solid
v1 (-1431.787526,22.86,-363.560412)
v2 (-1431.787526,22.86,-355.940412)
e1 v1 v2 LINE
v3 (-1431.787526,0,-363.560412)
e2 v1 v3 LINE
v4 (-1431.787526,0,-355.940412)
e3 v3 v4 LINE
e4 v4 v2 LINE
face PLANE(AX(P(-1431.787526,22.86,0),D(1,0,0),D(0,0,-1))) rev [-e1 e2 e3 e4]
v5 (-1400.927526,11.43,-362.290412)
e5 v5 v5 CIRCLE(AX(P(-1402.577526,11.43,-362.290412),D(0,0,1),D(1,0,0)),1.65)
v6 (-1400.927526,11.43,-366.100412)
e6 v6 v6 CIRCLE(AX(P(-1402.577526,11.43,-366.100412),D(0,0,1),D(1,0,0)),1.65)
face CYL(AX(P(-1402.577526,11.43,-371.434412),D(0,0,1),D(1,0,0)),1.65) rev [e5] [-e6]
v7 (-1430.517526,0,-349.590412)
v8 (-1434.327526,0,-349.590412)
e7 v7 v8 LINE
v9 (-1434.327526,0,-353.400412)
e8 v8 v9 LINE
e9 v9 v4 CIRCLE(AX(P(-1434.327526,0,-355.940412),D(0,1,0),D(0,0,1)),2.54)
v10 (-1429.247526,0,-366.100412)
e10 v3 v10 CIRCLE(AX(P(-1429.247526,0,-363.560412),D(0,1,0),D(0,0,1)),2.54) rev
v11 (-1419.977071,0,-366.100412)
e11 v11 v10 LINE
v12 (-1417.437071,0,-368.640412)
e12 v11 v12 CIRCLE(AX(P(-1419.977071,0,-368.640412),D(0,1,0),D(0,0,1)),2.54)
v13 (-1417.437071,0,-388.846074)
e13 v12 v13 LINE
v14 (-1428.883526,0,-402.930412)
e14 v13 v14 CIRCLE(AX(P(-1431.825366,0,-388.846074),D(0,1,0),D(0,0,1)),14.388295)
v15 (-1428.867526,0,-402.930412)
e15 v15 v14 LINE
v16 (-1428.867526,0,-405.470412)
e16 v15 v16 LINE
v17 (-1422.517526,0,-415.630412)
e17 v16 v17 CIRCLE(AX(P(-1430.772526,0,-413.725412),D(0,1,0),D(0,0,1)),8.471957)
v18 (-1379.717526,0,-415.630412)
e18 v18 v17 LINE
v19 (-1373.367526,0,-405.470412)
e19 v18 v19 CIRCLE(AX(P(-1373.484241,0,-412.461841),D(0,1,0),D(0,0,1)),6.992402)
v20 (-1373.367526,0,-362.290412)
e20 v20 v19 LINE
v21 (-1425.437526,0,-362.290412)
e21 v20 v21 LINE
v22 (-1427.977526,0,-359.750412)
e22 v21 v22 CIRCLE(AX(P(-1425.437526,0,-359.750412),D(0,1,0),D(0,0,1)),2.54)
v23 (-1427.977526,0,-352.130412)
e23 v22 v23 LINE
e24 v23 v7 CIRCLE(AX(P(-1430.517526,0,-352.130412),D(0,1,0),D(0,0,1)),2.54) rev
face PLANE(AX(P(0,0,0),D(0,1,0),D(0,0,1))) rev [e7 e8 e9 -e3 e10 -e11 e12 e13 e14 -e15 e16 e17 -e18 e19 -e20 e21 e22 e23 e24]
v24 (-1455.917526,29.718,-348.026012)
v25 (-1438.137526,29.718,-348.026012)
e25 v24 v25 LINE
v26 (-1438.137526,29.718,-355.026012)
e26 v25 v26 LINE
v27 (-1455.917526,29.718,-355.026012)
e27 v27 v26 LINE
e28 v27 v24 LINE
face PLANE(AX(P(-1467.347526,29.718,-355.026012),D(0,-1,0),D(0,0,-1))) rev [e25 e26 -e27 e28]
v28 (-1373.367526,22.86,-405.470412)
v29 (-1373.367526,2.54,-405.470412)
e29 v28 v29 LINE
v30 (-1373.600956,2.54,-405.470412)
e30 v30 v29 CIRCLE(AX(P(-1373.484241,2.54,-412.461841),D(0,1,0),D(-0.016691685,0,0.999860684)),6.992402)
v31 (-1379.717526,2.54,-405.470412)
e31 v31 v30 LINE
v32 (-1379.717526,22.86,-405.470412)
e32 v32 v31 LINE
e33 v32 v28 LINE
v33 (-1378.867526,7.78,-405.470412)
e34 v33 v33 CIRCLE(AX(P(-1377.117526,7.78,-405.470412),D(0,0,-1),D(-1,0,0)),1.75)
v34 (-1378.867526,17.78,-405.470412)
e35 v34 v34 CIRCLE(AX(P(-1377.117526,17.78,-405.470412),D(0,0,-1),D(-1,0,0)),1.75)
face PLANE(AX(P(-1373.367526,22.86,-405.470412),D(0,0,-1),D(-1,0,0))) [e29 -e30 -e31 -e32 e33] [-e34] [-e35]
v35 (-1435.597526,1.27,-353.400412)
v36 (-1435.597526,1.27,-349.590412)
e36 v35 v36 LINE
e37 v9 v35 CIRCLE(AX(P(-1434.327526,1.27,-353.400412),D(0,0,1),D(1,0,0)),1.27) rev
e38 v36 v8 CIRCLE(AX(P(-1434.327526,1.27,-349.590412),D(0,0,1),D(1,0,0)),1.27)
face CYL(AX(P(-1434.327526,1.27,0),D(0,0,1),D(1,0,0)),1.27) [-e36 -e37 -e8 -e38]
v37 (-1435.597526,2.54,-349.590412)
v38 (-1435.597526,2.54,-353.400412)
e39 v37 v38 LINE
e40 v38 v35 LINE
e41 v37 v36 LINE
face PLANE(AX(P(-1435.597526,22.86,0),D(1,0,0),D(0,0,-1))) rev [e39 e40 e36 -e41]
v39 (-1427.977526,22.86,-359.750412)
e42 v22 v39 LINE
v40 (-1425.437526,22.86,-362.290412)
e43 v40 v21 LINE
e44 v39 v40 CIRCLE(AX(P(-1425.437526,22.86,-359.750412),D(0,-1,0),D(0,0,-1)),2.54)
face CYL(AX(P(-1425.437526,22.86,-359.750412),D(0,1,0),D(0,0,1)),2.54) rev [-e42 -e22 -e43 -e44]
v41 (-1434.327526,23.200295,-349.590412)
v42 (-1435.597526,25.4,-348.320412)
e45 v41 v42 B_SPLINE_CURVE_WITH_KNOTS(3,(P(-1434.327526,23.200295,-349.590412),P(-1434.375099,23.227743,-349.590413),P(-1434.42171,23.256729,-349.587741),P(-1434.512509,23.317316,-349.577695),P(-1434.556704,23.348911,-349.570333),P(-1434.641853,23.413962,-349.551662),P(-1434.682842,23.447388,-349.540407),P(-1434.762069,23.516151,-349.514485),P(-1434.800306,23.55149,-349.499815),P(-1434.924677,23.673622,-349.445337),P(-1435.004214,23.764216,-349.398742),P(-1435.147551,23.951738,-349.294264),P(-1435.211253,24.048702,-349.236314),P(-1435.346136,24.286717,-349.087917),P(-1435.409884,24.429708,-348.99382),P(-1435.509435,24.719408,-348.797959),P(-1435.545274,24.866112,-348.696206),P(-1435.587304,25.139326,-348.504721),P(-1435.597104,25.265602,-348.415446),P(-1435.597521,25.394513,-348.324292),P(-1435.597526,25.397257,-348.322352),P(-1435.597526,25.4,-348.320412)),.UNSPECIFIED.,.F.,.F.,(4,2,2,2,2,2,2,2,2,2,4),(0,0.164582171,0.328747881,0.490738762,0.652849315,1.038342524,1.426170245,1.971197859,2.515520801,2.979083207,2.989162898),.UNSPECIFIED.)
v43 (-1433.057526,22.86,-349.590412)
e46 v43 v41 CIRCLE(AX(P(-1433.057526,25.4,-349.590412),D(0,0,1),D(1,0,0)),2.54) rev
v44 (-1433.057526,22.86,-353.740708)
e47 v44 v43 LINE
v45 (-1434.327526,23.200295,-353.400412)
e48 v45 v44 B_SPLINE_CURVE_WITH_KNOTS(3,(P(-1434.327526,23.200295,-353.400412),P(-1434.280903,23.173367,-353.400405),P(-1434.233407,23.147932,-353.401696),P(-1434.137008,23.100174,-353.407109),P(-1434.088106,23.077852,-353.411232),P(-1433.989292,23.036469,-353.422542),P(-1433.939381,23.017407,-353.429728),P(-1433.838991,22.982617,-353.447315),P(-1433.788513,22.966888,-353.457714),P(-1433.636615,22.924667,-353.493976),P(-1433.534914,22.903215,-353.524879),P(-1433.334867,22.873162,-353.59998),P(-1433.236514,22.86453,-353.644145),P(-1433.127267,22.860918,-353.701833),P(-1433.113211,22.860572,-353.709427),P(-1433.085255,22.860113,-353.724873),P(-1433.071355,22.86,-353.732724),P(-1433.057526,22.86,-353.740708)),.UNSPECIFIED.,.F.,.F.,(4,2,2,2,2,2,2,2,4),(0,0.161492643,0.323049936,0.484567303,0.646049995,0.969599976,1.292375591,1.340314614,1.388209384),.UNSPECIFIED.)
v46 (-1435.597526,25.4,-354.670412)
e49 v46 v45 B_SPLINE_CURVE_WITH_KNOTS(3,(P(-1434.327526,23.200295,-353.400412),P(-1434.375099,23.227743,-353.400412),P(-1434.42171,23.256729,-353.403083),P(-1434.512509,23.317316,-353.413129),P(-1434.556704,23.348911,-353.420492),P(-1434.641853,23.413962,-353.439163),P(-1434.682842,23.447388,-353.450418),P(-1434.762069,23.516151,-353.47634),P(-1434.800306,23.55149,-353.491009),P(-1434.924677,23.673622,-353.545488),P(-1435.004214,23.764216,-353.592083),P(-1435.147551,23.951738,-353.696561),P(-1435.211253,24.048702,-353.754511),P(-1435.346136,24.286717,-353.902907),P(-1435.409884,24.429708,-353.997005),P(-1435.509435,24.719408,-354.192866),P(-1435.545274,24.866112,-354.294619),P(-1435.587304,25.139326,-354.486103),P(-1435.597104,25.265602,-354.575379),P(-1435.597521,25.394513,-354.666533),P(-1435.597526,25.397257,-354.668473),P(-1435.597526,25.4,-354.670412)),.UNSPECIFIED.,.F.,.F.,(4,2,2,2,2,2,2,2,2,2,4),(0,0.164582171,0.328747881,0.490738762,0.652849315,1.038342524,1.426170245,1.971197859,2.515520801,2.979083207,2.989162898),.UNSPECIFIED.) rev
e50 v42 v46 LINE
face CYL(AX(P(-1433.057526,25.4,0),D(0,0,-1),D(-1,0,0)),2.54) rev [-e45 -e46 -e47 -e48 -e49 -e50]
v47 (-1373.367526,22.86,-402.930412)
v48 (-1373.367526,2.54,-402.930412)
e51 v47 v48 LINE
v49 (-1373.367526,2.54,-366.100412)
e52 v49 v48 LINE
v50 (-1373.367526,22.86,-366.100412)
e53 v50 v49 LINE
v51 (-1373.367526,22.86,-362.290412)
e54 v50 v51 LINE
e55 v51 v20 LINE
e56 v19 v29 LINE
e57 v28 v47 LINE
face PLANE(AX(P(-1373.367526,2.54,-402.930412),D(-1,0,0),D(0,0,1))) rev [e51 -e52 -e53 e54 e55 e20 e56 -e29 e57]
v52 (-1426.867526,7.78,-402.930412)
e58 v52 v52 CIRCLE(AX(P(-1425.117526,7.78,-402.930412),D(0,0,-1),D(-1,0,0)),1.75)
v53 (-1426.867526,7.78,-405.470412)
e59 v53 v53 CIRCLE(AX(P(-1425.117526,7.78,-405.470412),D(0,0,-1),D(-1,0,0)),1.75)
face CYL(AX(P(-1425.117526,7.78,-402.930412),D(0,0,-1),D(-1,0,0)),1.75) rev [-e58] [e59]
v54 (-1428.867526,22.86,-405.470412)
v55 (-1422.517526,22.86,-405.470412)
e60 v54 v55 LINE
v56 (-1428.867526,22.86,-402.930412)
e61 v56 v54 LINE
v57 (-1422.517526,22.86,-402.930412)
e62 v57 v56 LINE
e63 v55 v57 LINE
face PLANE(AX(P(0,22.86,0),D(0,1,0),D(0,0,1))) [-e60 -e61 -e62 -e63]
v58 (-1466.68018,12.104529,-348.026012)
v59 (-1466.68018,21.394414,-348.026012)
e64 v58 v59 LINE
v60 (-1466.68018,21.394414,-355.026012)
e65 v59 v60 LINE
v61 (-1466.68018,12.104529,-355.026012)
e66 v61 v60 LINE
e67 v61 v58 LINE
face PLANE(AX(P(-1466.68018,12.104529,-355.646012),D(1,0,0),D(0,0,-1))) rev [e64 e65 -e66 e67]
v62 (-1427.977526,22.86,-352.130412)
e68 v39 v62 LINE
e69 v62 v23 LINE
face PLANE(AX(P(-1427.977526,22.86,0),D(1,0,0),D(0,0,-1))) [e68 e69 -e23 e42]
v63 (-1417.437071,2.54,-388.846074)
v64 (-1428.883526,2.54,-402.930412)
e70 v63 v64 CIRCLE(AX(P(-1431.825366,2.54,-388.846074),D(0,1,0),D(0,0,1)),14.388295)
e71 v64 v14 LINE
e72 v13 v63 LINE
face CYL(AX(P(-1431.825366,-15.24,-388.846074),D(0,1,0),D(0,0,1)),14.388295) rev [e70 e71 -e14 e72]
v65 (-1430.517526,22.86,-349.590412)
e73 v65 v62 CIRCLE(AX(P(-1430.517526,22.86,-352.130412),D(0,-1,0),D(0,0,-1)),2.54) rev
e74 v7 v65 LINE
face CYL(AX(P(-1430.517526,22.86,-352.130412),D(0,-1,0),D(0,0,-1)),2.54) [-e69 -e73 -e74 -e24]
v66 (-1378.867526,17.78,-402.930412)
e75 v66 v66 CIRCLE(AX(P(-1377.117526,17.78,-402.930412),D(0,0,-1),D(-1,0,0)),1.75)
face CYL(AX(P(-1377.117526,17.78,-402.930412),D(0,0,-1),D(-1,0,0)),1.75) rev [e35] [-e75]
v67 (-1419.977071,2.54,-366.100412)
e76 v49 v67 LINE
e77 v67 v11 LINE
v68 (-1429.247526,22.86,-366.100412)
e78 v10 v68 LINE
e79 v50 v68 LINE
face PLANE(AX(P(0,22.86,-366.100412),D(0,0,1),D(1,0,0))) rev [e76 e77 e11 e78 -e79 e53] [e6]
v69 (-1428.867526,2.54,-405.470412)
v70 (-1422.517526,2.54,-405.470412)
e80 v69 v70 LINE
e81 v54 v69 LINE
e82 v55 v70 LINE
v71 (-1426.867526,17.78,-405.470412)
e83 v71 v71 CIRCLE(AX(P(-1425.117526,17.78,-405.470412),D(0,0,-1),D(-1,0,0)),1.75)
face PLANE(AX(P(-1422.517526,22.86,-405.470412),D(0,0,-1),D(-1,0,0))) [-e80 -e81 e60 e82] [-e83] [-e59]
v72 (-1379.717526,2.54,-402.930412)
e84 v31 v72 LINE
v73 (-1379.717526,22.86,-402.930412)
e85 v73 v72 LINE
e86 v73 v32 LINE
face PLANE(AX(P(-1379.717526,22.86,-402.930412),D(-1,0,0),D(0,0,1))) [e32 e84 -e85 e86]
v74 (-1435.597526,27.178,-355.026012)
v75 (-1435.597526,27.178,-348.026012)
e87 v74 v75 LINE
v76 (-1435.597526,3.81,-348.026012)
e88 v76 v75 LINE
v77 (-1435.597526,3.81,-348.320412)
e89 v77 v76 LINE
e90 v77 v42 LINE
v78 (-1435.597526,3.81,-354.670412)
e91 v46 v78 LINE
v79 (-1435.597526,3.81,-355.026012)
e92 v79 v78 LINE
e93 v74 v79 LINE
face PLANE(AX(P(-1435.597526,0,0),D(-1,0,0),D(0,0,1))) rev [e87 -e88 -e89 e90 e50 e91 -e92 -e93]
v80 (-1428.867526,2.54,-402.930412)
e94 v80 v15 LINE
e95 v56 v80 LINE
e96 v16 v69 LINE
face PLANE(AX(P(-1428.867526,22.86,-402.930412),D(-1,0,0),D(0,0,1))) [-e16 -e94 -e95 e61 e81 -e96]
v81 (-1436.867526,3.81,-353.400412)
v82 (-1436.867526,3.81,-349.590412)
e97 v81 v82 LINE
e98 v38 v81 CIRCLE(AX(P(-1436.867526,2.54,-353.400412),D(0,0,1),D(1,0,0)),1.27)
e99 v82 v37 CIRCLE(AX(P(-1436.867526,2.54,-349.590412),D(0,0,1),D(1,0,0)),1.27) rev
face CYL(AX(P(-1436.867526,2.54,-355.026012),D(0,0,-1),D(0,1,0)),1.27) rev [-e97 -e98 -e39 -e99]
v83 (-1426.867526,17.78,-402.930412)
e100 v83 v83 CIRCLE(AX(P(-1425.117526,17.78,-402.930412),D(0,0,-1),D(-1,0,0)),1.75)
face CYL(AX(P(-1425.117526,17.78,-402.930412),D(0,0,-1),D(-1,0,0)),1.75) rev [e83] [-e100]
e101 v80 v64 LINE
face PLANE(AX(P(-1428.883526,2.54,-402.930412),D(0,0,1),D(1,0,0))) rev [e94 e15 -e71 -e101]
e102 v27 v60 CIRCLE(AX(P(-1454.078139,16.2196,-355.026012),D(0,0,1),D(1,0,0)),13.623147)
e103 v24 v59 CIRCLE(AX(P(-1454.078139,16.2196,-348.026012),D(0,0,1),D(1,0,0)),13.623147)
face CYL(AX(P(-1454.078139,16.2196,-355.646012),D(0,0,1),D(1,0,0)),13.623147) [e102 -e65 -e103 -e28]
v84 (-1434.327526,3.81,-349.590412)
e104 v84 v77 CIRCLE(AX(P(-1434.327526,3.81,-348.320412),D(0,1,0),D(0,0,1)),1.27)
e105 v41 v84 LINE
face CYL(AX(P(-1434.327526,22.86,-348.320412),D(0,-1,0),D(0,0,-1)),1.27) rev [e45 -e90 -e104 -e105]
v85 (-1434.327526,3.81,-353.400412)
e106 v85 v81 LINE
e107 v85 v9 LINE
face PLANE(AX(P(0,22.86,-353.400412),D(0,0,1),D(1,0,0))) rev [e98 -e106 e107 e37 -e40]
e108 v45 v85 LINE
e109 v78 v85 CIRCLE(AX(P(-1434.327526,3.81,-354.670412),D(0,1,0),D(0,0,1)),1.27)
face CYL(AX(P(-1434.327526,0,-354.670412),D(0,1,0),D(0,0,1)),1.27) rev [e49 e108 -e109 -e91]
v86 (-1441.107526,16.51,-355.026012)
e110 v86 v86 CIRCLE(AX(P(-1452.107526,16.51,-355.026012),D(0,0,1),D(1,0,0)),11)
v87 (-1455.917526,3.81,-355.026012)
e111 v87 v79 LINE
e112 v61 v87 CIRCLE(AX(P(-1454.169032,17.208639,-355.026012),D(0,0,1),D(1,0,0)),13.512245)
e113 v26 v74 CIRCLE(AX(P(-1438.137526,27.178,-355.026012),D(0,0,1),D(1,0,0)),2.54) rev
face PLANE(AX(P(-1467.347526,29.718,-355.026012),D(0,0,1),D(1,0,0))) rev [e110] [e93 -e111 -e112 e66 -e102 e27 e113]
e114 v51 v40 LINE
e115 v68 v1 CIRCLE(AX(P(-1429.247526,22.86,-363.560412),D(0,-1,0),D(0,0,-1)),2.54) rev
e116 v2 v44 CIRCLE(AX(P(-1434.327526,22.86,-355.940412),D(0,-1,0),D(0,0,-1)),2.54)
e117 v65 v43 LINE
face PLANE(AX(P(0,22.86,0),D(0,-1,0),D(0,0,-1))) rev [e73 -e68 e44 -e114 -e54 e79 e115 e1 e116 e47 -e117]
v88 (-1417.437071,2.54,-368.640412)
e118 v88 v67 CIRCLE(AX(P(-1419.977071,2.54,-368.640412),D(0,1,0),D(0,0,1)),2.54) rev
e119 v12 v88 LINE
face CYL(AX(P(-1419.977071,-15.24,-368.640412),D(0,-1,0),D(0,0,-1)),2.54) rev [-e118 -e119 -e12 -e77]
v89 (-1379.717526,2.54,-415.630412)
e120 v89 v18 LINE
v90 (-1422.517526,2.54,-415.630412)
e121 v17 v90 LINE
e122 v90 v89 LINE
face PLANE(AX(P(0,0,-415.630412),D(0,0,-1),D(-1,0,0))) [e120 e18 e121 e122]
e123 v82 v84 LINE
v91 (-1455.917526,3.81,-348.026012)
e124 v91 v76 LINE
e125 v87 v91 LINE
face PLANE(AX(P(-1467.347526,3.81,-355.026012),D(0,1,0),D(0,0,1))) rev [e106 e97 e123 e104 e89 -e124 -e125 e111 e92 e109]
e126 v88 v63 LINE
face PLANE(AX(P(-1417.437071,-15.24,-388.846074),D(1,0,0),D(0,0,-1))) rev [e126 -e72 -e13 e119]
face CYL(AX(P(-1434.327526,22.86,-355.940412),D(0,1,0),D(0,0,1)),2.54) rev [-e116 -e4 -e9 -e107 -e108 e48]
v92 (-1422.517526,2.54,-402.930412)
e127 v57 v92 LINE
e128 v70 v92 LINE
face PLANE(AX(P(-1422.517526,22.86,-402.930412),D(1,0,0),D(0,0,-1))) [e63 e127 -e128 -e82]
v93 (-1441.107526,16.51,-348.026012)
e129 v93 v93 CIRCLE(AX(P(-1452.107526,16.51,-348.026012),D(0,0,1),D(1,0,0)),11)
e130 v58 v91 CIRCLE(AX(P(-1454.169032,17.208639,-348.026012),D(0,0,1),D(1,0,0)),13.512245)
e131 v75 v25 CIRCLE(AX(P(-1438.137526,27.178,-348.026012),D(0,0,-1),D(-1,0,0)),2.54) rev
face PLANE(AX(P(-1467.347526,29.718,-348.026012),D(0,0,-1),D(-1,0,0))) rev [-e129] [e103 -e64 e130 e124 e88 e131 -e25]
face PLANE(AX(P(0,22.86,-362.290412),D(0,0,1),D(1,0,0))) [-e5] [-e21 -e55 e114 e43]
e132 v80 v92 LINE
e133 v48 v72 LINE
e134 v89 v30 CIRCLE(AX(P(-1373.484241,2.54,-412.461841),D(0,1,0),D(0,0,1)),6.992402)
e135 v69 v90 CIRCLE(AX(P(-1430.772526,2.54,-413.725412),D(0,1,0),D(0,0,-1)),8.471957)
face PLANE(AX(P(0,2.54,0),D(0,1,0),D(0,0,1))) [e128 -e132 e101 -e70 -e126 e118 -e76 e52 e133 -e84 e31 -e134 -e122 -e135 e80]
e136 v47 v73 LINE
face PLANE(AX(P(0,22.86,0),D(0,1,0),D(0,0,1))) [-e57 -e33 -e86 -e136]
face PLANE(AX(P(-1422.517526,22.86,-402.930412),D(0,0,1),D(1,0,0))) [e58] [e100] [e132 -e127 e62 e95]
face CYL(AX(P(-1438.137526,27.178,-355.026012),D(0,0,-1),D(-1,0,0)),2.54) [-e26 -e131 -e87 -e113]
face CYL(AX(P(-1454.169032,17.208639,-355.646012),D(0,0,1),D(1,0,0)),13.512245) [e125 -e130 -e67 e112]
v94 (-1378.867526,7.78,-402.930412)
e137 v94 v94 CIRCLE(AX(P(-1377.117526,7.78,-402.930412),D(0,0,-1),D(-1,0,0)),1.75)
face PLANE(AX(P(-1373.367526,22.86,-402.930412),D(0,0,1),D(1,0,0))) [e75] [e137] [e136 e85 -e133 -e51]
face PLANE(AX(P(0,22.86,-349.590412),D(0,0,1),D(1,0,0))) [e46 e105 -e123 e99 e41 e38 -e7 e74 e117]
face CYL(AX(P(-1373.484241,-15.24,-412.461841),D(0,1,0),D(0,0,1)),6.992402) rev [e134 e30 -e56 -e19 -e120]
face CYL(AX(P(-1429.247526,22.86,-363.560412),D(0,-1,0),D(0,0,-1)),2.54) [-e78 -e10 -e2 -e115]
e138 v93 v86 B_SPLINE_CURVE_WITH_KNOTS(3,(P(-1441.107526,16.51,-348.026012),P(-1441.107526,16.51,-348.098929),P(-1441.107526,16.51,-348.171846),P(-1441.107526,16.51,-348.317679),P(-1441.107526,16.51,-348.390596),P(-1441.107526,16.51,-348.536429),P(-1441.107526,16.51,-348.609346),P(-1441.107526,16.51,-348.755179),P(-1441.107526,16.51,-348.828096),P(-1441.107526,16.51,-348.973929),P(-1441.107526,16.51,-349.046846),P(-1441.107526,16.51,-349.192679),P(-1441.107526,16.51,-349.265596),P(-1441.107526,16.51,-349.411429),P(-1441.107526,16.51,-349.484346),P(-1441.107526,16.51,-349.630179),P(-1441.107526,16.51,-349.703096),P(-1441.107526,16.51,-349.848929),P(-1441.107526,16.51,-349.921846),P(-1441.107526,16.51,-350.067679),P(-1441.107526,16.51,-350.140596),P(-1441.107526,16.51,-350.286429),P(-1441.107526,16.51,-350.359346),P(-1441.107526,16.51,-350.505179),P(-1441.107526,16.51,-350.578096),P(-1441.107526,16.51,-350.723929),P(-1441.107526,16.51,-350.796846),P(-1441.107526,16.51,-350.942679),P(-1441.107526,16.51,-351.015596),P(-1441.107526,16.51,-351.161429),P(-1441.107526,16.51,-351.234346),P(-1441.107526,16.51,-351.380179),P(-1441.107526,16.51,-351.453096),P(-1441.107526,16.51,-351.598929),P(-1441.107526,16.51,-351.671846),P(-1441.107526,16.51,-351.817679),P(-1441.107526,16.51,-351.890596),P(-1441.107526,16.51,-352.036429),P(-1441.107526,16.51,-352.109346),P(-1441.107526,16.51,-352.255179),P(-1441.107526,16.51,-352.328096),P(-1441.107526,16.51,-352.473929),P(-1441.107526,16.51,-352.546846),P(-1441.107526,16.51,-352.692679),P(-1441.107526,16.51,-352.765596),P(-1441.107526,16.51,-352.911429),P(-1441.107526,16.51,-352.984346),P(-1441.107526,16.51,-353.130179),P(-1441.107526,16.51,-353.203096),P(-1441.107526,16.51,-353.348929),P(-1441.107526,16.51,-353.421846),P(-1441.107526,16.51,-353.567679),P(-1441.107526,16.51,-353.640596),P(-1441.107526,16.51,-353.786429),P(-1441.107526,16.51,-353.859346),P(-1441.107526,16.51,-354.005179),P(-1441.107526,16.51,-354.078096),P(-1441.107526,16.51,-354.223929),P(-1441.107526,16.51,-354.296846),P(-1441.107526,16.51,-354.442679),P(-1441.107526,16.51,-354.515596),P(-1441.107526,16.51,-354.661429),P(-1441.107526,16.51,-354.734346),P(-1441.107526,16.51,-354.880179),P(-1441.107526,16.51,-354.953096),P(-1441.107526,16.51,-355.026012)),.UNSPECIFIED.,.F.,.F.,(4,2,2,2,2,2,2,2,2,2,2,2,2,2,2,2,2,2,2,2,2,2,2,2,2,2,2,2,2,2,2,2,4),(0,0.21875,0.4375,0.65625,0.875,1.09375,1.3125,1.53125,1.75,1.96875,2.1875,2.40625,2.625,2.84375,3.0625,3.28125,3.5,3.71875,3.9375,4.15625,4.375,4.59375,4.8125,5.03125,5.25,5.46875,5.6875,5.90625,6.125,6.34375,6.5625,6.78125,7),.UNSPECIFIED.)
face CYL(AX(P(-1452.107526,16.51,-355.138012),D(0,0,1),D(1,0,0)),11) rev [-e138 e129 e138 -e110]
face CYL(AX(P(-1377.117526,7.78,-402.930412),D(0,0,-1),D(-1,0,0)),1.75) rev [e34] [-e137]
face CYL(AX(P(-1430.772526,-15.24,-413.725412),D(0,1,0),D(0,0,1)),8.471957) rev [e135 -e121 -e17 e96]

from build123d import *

# Parameters (mm, degrees)
SKETCH2_W            = 55.515999966
SKETCH2_H            = 31.75
BOSS_EXTRUDE1_DEPTH  = 2.54
SKETCH4_W            = 6.35
SKETCH4_H            = 2.54
BOSS_EXTRUDE7_DEPTH  = 22.86
SKETCH29_W           = 55.515999966
SKETCH29_H           = 2.54
BOSS_EXTRUDE12_DEPTH = 5.08
SKETCH31_W           = 3.81
SKETCH31_H           = 8.89
BOSS_EXTRUDE13_DEPTH = 22.86
SKETCH32_W           = 7
SKETCH32_H           = 25.908
BOSS_EXTRUDE14_DEPTH = 31.75
SKETCH33_R           = 1.65
CUT_EXTRUDE5_DEPTH   = 9.144
SKETCH36_R           = 1.75
CUT_EXTRUDE7_DEPTH   = 2.54
SKETCH37_W           = 42.8
SKETCH37_H           = 2.54
BOSS_EXTRUDE15_DEPTH = 12.7
SKETCH38_W           = 55.5
SKETCH38_H           = 2.54
BOSS_EXTRUDE16_DEPTH = 6.35
CUT_EXTRUDE19_DEPTH  = 17.78
FILLET9_R            = 2.54
FILLET11_R           = 2.54
FILLET12_R           = 2.54
FILLET13_R           = 2.54
SKETCH47_R           = 11
CUT_EXTRUDE21_DEPTH  = 7.112
FILLET17_R           = 1.27
FILLET18_R           = 1.27
FILLET19_R           = 2.54
CUT_EXTRUDE24_DEPTH  = 7.62
SKETCH52_W           = 0.667345496
SKETCH52_H           = 9.289885036
CUT_EXTRUDE25_DEPTH  = 7.62


with BuildPart() as part:
    # Sketch2 → Boss-Extrude1 (new body)
    with BuildSketch(Plane(origin=(0, 0, 0), x_dir=(1, 0, 0), z_dir=(0, 1, 0))):
        with Locations((-1401.125525756, 387.055412371)):
            Rectangle(SKETCH2_W, SKETCH2_H)
    extrude(amount=BOSS_EXTRUDE1_DEPTH)

    # Sketch4 → Boss-Extrude7 (add)
    with BuildSketch(Plane.XZ):
        with Locations((-1376.542525773, -404.200412371)):
            Rectangle(SKETCH4_W, SKETCH4_H)
        with Locations((-1425.692525773, -404.200412371)):
            Rectangle(SKETCH4_W, SKETCH4_H)
    extrude(amount=-BOSS_EXTRUDE7_DEPTH)

    # Sketch29 → Boss-Extrude12 (add)
    with BuildSketch(Plane.XY.offset(-371.180412371)):
        with Locations((-1401.125525756, 1.27)):
            Rectangle(SKETCH29_W, SKETCH29_H)
    extrude(amount=BOSS_EXTRUDE12_DEPTH)

    # Sketch31 → Boss-Extrude13 (add)
    with BuildSketch(Plane.XZ):
        Polygon((-1428.883525739, -366.100412371), (-1373.367525773, -366.100412371), (-1373.367525773, -362.290412371), (-1427.977525773, -362.290412371), (-1431.787525773, -362.290412371), (-1431.787525773, -366.100412371), align=None)
        with Locations((-1429.882525773, -357.845412371)):
            Rectangle(SKETCH31_W, SKETCH31_H)
        Polygon((-1431.787525773, -353.400412371), (-1427.977525773, -353.400412371), (-1427.977525773, -349.590412371), (-1435.597525773, -349.590412371), (-1435.597525773, -353.400412371), align=None)
    extrude(amount=-BOSS_EXTRUDE13_DEPTH)

    # Sketch32 → Boss-Extrude14 (add)
    with BuildSketch(Plane.ZY.offset(1435.597525773)):
        with Locations((-351.526012371, 16.764)):
            Rectangle(SKETCH32_W, SKETCH32_H)
    extrude(amount=BOSS_EXTRUDE14_DEPTH)

    # Sketch33 → Cut-Extrude5 (cut)
    with BuildSketch(Plane.XY.offset(-362.290412371)):
        with Locations((-1402.577525773, 11.43)):
            Circle(SKETCH33_R)
    extrude(amount=-CUT_EXTRUDE5_DEPTH, mode=Mode.SUBTRACT)

    # Sketch36 → Cut-Extrude7 (cut)
    with BuildSketch(Plane(origin=(0, 0, -405.470412371), x_dir=(-1, 0, 0), z_dir=(0, 0, -1))):
        with Locations((1425.117525773, 17.78)):
            Circle(SKETCH36_R)
        with Locations((1425.117525773, 7.78)):
            Circle(SKETCH36_R)
        with Locations((1377.117525773, 17.78)):
            Circle(SKETCH36_R)
        with Locations((1377.117525773, 7.78)):
            Circle(SKETCH36_R)
    extrude(amount=-CUT_EXTRUDE7_DEPTH, mode=Mode.SUBTRACT)

    # Sketch37 → Boss-Extrude15 (add)
    with BuildSketch(Plane(origin=(0, 0, -402.930412371), x_dir=(-1, 0, 0), z_dir=(0, 0, -1))):
        with Locations((1401.117525773, 1.27)):
            Rectangle(SKETCH37_W, SKETCH37_H)
    extrude(amount=BOSS_EXTRUDE15_DEPTH)

    # Sketch38 → Boss-Extrude16 (add)
    with BuildSketch(Plane(origin=(0, 0, -405.470412371), x_dir=(-1, 0, 0), z_dir=(0, 0, -1))):
        with Locations((1401.117525773, 1.27)):
            Rectangle(SKETCH38_W, SKETCH38_H)
    extrude(amount=BOSS_EXTRUDE16_DEPTH)

    # Sketch46 → Cut-Extrude19 (cut)
    with BuildSketch(Plane(origin=(0, 2.54, 0), x_dir=(1, 0, 0), z_dir=(0, 1, 0))):
        with BuildLine():
            Line((-1422.517525773, 415.630412371), (-1428.867525773, 415.630412371))
            Line((-1428.867525773, 415.630412371), (-1428.867525773, 405.470412371))
            ThreePointArc((-1428.867525773, 405.470412371), (-1423.588320876, 409.235284311), (-1422.517525773, 415.630412371))
        make_face()
        with BuildLine():
            Line((-1417.437071461, 366.100412371), (-1428.883525739, 366.100412371))
            Line((-1428.883525739, 366.100412371), (-1428.883525739, 402.930412371))
            ThreePointArc((-1428.883525739, 402.930412371), (-1420.659545742, 397.92062476), (-1417.437071461, 388.846073619))
            Line((-1417.437071461, 388.846073619), (-1417.437071461, 366.100412371))
        make_face()
        with BuildLine():
            Line((-1373.367525773, 405.470412371), (-1373.367525773, 415.630412371))
            Line((-1373.367525773, 415.630412371), (-1379.717525773, 415.630412371))
            ThreePointArc((-1379.717525773, 415.630412371), (-1379.413786034, 408.755874708), (-1373.367525773, 405.470412371))
        make_face()
    extrude(amount=-CUT_EXTRUDE19_DEPTH, mode=Mode.SUBTRACT)

    # Fillet9
    fillet9_edges = [part.edges().sort_by_distance(p)[0] for p in [
        (-1417.437071461, 1.27, -366.100412371),
    ]]
    fillet(fillet9_edges, radius=FILLET9_R)

    # Fillet11
    fillet11_edges = [part.edges().sort_by_distance(p)[0] for p in [
        (-1431.787525773, 11.43, -353.400412371),
    ]]
    fillet(fillet11_edges, radius=FILLET11_R)

    # Fillet12
    fillet12_edges = [part.edges().sort_by_distance(p)[0] for p in [
        (-1427.977525773, 11.43, -362.290412371),
    ]]
    fillet(fillet12_edges, radius=FILLET12_R)

    # Fillet13
    fillet13_edges = [part.edges().sort_by_distance(p)[0] for p in [
        (-1431.787525773, 11.43, -366.100412371),
        (-1427.977525773, 11.43, -349.590412371),
    ]]
    fillet(fillet13_edges, radius=FILLET13_R)

    # Sketch47 → Cut-Extrude21 (cut)
    with BuildSketch(Plane.XY.offset(-348.026012371)):
        with Locations((-1452.107525773, 16.51)):
            Circle(SKETCH47_R)
    extrude(amount=-CUT_EXTRUDE21_DEPTH, mode=Mode.SUBTRACT)

    # Fillet17
    fillet17_edges = [part.edges().sort_by_distance(p)[0] for p in [
        (-1435.597525773, 3.81, -351.495412371),
        (-1435.597525773, 0, -351.495412371),
    ]]
    fillet(fillet17_edges, radius=FILLET17_R)

    # Fillet18
    fillet18_edges = [part.edges().sort_by_distance(p)[0] for p in [
        (-1435.597525773, 13.335, -353.400412371),
        (-1435.597525773, 13.335, -349.590412371),
    ]]
    fillet(fillet18_edges, radius=FILLET18_R - 0.0001)  # a hair under: the kernel refuses the full size

    # Fillet19
    fillet19_edges = [part.edges().sort_by_distance(p)[0] for p in [
        (-1435.597525773, 29.718, -351.526012371),
        (-1435.597525773, 22.86, -351.495412371),
    ]]
    fillet(fillet19_edges, radius=FILLET19_R)

    # Sketch51 → Cut-Extrude24 (cut)
    with BuildSketch(Plane.XY.offset(-348.026012371)):
        with BuildLine():
            Line((-1467.347525773, 29.718), (-1467.347525773, 19.304))
            ThreePointArc((-1467.347525773, 19.304), (-1463.253192632, 26.289780699), (-1455.917525773, 29.718))
            Line((-1455.917525773, 29.718), (-1467.347525773, 29.718))
        make_face()
        with BuildLine():
            ThreePointArc((-1455.917525773, 3.81), (-1463.26939399, 7.220437323), (-1467.347525773, 14.224))
            Line((-1467.347525773, 14.224), (-1467.347525773, 3.81))
            Line((-1467.347525773, 3.81), (-1455.917525773, 3.81))
        make_face()
    extrude(amount=-CUT_EXTRUDE24_DEPTH, mode=Mode.SUBTRACT)

    # Sketch52 → Cut-Extrude25 (cut)
    with BuildSketch(Plane.XY.offset(-348.026012371)):
        with Locations((-1467.013853025, 16.749471922)):
            Rectangle(SKETCH52_W, SKETCH52_H)
    extrude(amount=-CUT_EXTRUDE25_DEPTH, mode=Mode.SUBTRACT)


solid = part.part
